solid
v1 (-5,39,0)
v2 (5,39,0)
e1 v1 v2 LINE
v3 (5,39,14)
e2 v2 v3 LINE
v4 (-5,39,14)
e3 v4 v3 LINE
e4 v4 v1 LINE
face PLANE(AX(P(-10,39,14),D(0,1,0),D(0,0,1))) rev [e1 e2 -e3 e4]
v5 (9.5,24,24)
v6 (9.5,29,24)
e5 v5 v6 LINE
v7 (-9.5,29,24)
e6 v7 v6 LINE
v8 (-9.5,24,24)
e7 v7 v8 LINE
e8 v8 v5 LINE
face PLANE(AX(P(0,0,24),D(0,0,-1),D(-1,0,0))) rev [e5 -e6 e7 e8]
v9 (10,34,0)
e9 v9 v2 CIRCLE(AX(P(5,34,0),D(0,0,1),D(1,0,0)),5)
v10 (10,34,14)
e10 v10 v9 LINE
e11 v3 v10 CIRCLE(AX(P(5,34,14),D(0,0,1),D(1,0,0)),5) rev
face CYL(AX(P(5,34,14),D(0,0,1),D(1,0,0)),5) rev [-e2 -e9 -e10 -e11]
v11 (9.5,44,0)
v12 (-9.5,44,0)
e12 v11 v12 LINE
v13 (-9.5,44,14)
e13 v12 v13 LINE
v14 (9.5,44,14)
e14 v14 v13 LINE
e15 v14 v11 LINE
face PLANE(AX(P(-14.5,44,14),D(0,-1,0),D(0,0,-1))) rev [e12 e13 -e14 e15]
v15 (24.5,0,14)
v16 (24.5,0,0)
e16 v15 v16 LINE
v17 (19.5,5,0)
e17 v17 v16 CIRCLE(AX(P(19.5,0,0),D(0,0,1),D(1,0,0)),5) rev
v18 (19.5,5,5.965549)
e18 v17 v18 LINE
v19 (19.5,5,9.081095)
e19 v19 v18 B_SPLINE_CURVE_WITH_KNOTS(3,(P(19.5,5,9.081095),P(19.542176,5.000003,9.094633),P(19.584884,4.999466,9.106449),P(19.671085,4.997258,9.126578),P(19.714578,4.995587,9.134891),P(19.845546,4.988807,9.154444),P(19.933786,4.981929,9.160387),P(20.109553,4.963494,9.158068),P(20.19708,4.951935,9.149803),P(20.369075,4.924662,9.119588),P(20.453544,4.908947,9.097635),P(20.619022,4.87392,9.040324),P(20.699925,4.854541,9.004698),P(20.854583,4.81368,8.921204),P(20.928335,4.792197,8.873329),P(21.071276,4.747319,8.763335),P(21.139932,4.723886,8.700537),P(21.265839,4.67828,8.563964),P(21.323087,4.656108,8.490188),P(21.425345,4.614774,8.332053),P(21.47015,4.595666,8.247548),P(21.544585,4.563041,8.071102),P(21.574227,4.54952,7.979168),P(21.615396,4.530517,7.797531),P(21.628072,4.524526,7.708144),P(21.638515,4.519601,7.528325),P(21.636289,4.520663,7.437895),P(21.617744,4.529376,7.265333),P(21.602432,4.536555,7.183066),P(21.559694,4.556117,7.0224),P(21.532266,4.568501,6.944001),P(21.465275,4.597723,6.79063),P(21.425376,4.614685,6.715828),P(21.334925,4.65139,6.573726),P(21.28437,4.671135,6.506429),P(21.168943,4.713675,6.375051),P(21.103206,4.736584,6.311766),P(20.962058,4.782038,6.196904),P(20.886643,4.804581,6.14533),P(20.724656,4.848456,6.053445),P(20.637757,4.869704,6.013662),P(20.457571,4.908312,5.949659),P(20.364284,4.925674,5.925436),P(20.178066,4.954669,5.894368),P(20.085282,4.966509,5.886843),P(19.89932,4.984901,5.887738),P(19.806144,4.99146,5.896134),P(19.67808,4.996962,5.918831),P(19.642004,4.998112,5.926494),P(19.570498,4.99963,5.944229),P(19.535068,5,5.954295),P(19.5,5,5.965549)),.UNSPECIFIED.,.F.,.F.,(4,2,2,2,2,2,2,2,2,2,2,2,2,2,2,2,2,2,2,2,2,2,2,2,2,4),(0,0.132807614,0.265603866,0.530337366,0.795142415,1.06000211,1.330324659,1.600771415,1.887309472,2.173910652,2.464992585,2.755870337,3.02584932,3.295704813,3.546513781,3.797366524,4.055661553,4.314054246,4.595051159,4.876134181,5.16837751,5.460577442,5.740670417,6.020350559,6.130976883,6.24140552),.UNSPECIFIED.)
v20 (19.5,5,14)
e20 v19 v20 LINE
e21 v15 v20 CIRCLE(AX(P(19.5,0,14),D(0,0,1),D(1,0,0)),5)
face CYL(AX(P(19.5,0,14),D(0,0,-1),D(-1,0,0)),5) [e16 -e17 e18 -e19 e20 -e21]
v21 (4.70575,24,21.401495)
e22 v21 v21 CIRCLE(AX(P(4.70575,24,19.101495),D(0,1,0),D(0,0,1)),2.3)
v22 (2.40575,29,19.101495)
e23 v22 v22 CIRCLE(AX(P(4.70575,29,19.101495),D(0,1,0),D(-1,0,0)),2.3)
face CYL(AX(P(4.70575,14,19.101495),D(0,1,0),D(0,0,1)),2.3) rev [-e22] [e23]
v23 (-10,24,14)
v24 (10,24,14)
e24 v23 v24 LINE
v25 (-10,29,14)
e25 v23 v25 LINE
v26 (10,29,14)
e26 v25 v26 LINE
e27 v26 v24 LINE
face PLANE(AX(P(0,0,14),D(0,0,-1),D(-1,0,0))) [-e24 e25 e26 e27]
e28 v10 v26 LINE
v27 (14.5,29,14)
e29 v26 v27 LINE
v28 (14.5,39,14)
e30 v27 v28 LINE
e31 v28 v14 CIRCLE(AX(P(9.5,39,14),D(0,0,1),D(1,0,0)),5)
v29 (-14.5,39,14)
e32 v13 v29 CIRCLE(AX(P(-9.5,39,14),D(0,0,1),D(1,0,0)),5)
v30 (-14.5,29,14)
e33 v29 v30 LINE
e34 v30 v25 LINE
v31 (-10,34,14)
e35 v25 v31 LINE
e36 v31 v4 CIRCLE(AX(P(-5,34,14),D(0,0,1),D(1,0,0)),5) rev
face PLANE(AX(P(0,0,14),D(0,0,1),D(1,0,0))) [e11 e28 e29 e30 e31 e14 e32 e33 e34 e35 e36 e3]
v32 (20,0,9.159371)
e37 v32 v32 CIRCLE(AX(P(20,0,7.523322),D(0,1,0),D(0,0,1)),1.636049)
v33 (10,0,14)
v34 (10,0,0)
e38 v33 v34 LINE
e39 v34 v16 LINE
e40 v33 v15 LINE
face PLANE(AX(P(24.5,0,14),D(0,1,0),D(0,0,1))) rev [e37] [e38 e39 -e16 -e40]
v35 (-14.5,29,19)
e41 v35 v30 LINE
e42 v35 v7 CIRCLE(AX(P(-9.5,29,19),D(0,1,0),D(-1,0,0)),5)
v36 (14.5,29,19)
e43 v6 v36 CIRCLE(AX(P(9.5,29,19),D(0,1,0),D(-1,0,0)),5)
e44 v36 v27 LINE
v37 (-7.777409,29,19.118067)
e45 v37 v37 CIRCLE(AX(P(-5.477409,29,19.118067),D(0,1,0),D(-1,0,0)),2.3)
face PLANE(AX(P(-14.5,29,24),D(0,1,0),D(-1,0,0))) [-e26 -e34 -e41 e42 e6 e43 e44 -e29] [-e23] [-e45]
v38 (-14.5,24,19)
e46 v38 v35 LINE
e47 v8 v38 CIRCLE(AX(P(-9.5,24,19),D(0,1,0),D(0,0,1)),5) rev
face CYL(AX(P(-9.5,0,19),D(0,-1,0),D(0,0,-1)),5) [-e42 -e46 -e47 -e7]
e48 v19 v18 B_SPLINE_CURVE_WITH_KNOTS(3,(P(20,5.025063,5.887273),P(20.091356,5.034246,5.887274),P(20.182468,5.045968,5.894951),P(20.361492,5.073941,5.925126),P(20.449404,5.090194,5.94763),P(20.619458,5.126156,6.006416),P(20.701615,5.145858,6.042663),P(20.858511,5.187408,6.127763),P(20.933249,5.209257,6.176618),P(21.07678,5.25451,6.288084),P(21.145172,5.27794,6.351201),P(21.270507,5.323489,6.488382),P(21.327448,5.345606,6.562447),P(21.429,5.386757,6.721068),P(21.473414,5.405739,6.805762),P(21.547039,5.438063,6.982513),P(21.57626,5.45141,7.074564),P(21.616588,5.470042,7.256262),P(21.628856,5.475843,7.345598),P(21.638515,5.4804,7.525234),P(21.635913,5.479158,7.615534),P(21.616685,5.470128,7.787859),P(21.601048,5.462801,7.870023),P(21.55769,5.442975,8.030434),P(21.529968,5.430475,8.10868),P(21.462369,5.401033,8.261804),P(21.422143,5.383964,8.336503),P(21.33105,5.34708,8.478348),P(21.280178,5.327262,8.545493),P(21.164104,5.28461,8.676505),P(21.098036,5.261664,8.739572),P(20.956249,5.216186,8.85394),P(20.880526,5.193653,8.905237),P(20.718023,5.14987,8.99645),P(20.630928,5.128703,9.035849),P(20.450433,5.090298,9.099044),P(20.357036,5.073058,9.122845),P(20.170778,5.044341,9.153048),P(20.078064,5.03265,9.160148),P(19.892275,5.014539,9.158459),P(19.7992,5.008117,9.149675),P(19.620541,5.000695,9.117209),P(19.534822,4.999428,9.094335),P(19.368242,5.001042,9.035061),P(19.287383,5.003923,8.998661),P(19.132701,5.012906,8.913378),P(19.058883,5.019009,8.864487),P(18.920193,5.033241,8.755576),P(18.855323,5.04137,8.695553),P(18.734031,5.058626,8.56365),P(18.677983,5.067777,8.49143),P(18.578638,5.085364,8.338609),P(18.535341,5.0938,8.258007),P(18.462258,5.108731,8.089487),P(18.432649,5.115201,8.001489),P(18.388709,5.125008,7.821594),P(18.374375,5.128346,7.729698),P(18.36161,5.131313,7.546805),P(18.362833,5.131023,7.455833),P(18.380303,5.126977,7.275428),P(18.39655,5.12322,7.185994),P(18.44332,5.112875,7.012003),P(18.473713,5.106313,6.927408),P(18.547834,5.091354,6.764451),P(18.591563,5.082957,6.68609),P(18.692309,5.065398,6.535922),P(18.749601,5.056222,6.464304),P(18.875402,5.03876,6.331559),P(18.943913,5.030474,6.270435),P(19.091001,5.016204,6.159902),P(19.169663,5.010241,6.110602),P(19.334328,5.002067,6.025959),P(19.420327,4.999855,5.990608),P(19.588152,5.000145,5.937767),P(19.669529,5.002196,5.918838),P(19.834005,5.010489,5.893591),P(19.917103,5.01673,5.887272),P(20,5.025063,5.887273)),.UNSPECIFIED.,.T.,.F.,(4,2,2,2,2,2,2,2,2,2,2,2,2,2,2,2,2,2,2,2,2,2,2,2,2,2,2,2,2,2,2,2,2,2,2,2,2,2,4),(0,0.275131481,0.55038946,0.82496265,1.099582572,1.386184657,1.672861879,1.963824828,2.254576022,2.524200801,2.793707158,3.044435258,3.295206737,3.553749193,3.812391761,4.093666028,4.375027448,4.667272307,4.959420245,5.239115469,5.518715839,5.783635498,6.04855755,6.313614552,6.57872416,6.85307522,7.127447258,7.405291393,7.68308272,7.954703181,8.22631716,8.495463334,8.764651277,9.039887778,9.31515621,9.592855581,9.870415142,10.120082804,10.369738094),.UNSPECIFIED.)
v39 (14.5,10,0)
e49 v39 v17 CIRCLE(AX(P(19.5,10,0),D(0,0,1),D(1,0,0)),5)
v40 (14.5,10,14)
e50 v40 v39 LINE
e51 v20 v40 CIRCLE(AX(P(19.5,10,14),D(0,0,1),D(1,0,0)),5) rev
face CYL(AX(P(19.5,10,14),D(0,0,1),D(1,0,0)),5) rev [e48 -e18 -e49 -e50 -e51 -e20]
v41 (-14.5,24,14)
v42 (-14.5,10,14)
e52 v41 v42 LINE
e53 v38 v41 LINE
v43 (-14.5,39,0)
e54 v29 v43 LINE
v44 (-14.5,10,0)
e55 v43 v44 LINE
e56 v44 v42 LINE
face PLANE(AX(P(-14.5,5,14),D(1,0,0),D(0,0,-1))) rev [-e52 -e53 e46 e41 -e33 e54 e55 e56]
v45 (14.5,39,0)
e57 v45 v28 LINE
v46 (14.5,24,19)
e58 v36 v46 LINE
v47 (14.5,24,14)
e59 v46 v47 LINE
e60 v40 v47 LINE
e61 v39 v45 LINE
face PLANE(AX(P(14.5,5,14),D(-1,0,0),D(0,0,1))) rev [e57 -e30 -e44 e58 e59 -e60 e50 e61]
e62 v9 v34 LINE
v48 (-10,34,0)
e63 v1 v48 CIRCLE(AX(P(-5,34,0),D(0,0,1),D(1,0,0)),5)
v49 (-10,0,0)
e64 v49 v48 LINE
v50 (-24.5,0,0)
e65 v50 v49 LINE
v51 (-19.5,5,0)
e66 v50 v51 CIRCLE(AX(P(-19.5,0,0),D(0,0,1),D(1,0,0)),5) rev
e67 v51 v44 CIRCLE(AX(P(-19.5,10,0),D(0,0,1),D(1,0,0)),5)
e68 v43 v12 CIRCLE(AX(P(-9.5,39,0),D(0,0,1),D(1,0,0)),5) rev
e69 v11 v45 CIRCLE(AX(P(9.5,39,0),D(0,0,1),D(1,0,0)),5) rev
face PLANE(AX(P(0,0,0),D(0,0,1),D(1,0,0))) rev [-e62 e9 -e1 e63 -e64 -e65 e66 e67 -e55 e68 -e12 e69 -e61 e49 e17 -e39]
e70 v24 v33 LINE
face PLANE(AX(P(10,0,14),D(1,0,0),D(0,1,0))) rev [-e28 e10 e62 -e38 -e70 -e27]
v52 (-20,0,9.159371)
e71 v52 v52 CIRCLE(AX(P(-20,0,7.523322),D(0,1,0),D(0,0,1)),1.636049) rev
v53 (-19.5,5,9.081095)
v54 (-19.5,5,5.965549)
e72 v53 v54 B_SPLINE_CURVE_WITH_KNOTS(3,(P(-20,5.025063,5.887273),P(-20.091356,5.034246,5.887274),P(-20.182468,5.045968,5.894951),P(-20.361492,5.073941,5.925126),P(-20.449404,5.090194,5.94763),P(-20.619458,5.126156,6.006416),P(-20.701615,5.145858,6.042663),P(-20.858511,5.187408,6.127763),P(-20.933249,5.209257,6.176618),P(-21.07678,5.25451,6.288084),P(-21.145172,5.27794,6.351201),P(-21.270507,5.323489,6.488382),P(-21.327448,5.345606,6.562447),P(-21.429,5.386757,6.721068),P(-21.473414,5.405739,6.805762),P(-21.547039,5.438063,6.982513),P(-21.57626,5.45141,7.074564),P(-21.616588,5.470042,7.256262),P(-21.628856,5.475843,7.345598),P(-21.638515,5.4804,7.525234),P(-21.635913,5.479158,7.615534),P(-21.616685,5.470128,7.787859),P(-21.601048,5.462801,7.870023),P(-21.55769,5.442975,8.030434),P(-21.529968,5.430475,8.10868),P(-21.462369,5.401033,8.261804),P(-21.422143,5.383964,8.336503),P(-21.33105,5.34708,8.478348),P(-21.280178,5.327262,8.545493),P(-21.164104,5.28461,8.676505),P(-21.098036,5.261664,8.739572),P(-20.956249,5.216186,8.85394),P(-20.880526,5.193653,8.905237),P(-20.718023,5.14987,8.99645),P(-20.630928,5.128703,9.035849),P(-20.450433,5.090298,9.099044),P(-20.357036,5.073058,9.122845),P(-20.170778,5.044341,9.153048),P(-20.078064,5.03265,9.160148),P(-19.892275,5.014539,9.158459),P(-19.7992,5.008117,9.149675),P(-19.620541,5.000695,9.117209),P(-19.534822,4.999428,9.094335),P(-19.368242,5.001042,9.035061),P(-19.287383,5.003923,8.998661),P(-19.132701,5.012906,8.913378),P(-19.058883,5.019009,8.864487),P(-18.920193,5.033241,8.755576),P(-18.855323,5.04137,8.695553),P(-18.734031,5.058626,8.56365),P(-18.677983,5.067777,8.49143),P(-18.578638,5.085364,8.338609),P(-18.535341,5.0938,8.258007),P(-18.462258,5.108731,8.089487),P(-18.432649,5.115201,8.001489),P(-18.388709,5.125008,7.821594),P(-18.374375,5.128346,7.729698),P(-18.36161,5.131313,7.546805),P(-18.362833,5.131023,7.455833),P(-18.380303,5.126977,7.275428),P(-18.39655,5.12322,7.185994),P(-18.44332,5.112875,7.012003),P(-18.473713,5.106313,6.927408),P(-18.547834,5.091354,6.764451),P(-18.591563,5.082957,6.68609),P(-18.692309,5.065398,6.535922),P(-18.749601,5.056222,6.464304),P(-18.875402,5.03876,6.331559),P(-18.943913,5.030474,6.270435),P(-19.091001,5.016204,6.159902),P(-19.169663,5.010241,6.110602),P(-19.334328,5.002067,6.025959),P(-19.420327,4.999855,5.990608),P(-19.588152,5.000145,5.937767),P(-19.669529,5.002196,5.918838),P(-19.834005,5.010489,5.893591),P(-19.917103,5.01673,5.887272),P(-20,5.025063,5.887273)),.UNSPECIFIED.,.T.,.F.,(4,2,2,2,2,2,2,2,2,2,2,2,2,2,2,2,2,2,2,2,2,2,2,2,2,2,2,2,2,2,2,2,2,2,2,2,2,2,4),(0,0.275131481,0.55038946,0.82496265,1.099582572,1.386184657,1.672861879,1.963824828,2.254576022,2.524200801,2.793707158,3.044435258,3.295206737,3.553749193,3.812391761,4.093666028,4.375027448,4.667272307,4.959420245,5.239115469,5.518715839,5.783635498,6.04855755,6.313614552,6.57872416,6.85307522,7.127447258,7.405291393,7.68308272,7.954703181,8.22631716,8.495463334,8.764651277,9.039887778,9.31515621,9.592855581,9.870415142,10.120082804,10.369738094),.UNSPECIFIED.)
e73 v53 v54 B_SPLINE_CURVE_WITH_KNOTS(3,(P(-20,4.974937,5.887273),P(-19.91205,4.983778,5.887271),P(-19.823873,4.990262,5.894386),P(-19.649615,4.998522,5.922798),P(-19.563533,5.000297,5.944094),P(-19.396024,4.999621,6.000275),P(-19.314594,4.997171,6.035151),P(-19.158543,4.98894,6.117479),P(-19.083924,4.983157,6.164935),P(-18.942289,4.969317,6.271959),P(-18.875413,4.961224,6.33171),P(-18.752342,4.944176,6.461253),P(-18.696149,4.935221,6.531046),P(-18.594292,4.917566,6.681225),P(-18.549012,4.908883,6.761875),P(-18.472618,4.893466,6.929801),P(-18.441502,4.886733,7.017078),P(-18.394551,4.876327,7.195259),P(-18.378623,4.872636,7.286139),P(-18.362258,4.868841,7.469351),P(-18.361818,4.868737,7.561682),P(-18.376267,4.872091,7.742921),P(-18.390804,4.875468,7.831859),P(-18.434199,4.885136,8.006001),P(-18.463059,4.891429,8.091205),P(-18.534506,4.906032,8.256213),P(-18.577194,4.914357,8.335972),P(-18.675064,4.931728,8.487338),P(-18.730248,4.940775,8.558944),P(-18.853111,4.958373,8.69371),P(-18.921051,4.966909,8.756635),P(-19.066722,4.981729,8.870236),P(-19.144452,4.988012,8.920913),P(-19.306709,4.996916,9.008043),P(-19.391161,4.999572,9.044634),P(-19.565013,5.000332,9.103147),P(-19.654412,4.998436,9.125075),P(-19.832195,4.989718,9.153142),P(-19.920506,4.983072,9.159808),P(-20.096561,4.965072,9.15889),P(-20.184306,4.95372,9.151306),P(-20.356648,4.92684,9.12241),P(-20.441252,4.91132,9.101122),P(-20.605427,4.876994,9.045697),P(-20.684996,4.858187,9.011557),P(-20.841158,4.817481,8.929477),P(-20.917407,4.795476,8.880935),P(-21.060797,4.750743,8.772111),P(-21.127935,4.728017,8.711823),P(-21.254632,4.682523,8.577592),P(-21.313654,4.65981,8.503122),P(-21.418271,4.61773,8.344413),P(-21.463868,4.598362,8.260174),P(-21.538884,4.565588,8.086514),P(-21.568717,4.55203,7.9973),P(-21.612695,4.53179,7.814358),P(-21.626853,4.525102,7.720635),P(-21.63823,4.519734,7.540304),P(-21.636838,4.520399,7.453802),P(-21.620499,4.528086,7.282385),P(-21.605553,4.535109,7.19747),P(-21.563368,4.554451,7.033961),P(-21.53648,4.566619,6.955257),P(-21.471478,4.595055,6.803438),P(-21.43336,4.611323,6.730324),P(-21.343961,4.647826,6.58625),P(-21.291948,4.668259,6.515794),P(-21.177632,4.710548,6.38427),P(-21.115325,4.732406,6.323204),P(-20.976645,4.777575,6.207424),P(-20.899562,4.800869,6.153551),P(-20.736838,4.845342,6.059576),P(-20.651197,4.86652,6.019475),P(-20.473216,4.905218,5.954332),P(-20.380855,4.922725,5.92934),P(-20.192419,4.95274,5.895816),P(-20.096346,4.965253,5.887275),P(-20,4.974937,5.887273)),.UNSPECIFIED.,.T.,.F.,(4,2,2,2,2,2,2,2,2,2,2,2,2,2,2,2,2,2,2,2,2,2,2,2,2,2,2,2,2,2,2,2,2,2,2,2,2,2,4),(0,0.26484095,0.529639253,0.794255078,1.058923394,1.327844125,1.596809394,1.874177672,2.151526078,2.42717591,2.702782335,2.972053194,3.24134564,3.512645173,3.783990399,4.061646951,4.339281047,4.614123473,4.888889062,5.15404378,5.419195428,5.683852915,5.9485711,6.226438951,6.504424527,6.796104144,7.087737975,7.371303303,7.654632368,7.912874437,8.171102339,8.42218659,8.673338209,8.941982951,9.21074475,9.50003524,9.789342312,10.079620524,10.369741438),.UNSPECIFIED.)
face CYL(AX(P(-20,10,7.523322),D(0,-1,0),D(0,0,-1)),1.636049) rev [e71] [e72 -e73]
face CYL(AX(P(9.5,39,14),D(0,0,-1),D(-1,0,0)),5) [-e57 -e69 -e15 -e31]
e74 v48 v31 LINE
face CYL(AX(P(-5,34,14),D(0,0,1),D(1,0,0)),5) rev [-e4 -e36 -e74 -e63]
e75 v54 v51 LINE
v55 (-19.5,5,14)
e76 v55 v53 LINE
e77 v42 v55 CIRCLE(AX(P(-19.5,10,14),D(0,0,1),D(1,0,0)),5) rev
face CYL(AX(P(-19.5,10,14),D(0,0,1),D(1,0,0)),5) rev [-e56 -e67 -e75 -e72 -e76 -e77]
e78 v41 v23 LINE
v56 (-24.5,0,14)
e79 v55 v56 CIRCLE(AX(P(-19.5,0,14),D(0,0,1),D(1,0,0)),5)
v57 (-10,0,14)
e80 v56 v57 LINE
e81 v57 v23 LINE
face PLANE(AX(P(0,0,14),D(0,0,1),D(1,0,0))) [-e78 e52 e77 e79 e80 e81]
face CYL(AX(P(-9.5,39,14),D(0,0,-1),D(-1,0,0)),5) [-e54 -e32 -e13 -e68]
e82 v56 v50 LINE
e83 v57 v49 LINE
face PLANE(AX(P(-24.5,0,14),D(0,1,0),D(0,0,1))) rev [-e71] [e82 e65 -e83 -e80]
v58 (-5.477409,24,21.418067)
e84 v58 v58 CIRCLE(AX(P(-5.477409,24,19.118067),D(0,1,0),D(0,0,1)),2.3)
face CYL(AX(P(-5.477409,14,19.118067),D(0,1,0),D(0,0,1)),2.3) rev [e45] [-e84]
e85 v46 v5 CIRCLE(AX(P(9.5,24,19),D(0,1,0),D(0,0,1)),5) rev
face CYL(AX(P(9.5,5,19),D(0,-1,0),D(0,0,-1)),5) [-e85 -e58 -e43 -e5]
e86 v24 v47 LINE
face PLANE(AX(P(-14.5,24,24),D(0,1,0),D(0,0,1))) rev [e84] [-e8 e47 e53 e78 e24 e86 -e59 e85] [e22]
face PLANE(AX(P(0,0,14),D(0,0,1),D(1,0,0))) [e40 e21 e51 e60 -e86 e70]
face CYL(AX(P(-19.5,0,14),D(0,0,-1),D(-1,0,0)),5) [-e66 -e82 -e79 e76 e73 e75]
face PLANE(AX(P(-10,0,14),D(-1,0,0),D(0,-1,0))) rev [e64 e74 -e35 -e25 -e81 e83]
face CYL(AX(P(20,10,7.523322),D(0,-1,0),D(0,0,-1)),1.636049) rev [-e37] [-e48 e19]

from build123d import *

# Parameters (mm, degrees)
BOSS_EXTRUDE1_DEPTH     = 14
FILLET1_R               = 5
FILLET2_R               = 5
CUT_EXTRUDE3_DEPTH      = 10
CUT_EXTRUDE3_DEPTH_BACK = 10
SKETCH2_R               = 1.636049027
SKETCH4_W               = 29
SKETCH4_H               = 5
BOSS_EXTRUDE2_DEPTH     = 10
SKETCH5_R               = 2.3
CUT_EXTRUDE4_DEPTH      = 30
FILLET3_R               = 5


with BuildPart() as part:
    # Sketch1 → Boss-Extrude1 (new body)
    with BuildSketch(Plane.XY):
        Polygon((-24.5, 0), (-24.5, 5), (-14.5, 5), (-14.5, 44), (14.5, 44), (14.5, 5), (24.5, 5), (24.5, 0), (10, 0), (10, 39), (-10, 39), (-10, 0), align=None)
    extrude(amount=BOSS_EXTRUDE1_DEPTH)

    # Fillet1
    fillet1_edges = [part.edges().sort_by_distance(p)[0] for p in [
        (-14.5, 44, 7),
        (14.5, 44, 7),
        (24.5, 5, 7),
        (-24.5, 5, 7),
        (14.5, 5, 7),
        (-14.5, 5, 7),
    ]]
    fillet(fillet1_edges, radius=FILLET1_R - 0.0001)  # a hair under: the kernel refuses the full size

    # Fillet2
    fillet2_edges = [part.edges().sort_by_distance(p)[0] for p in [
        (10, 39, 7),
        (-10, 39, 7),
    ]]
    fillet(fillet2_edges, radius=FILLET2_R)

    # Sketch2 → Cut-Extrude3 (cut, two sides: drawn at the far end of the back side and taken through both)
    with BuildSketch(Plane(origin=(0, 0, 0), x_dir=(1, 0, 0), z_dir=(0, 1, 0)).offset(-CUT_EXTRUDE3_DEPTH_BACK)):
        with Locations(Location((-20, -7.523321805, 0), (0, 0, 72.20487372))):
            Circle(SKETCH2_R)
        with Locations(Location((20, -7.523321805, 0), (0, 0, 107.795126278))):
            Circle(SKETCH2_R)
    extrude(amount=CUT_EXTRUDE3_DEPTH + CUT_EXTRUDE3_DEPTH_BACK, mode=Mode.SUBTRACT)

    # Sketch4 → Boss-Extrude2 (add)
    with BuildSketch(Plane.XY.offset(14)):
        with Locations((0, 26.5)):
            Rectangle(SKETCH4_W, SKETCH4_H)
    extrude(amount=BOSS_EXTRUDE2_DEPTH)

    # Sketch5 → Cut-Extrude4 (cut)
    with BuildSketch(Plane(origin=(0, 44, 0), x_dir=(1, 0, 0), z_dir=(0, 1, 0))):
        with Locations(Location((-5.477408827, -19.118067384, 0), (0, 0, 270))):
            Circle(SKETCH5_R)
        with Locations(Location((4.70575, -19.10149527, 0), (0, 0, 270))):
            Circle(SKETCH5_R)
    extrude(amount=-CUT_EXTRUDE4_DEPTH, mode=Mode.SUBTRACT)

    # Fillet3
    fillet3_edges = [part.edges().sort_by_distance(p)[0] for p in [
        (-14.5, 26.5, 24),
        (14.5, 26.5, 24),
    ]]
    fillet(fillet3_edges, radius=FILLET3_R)


solid = part.part
